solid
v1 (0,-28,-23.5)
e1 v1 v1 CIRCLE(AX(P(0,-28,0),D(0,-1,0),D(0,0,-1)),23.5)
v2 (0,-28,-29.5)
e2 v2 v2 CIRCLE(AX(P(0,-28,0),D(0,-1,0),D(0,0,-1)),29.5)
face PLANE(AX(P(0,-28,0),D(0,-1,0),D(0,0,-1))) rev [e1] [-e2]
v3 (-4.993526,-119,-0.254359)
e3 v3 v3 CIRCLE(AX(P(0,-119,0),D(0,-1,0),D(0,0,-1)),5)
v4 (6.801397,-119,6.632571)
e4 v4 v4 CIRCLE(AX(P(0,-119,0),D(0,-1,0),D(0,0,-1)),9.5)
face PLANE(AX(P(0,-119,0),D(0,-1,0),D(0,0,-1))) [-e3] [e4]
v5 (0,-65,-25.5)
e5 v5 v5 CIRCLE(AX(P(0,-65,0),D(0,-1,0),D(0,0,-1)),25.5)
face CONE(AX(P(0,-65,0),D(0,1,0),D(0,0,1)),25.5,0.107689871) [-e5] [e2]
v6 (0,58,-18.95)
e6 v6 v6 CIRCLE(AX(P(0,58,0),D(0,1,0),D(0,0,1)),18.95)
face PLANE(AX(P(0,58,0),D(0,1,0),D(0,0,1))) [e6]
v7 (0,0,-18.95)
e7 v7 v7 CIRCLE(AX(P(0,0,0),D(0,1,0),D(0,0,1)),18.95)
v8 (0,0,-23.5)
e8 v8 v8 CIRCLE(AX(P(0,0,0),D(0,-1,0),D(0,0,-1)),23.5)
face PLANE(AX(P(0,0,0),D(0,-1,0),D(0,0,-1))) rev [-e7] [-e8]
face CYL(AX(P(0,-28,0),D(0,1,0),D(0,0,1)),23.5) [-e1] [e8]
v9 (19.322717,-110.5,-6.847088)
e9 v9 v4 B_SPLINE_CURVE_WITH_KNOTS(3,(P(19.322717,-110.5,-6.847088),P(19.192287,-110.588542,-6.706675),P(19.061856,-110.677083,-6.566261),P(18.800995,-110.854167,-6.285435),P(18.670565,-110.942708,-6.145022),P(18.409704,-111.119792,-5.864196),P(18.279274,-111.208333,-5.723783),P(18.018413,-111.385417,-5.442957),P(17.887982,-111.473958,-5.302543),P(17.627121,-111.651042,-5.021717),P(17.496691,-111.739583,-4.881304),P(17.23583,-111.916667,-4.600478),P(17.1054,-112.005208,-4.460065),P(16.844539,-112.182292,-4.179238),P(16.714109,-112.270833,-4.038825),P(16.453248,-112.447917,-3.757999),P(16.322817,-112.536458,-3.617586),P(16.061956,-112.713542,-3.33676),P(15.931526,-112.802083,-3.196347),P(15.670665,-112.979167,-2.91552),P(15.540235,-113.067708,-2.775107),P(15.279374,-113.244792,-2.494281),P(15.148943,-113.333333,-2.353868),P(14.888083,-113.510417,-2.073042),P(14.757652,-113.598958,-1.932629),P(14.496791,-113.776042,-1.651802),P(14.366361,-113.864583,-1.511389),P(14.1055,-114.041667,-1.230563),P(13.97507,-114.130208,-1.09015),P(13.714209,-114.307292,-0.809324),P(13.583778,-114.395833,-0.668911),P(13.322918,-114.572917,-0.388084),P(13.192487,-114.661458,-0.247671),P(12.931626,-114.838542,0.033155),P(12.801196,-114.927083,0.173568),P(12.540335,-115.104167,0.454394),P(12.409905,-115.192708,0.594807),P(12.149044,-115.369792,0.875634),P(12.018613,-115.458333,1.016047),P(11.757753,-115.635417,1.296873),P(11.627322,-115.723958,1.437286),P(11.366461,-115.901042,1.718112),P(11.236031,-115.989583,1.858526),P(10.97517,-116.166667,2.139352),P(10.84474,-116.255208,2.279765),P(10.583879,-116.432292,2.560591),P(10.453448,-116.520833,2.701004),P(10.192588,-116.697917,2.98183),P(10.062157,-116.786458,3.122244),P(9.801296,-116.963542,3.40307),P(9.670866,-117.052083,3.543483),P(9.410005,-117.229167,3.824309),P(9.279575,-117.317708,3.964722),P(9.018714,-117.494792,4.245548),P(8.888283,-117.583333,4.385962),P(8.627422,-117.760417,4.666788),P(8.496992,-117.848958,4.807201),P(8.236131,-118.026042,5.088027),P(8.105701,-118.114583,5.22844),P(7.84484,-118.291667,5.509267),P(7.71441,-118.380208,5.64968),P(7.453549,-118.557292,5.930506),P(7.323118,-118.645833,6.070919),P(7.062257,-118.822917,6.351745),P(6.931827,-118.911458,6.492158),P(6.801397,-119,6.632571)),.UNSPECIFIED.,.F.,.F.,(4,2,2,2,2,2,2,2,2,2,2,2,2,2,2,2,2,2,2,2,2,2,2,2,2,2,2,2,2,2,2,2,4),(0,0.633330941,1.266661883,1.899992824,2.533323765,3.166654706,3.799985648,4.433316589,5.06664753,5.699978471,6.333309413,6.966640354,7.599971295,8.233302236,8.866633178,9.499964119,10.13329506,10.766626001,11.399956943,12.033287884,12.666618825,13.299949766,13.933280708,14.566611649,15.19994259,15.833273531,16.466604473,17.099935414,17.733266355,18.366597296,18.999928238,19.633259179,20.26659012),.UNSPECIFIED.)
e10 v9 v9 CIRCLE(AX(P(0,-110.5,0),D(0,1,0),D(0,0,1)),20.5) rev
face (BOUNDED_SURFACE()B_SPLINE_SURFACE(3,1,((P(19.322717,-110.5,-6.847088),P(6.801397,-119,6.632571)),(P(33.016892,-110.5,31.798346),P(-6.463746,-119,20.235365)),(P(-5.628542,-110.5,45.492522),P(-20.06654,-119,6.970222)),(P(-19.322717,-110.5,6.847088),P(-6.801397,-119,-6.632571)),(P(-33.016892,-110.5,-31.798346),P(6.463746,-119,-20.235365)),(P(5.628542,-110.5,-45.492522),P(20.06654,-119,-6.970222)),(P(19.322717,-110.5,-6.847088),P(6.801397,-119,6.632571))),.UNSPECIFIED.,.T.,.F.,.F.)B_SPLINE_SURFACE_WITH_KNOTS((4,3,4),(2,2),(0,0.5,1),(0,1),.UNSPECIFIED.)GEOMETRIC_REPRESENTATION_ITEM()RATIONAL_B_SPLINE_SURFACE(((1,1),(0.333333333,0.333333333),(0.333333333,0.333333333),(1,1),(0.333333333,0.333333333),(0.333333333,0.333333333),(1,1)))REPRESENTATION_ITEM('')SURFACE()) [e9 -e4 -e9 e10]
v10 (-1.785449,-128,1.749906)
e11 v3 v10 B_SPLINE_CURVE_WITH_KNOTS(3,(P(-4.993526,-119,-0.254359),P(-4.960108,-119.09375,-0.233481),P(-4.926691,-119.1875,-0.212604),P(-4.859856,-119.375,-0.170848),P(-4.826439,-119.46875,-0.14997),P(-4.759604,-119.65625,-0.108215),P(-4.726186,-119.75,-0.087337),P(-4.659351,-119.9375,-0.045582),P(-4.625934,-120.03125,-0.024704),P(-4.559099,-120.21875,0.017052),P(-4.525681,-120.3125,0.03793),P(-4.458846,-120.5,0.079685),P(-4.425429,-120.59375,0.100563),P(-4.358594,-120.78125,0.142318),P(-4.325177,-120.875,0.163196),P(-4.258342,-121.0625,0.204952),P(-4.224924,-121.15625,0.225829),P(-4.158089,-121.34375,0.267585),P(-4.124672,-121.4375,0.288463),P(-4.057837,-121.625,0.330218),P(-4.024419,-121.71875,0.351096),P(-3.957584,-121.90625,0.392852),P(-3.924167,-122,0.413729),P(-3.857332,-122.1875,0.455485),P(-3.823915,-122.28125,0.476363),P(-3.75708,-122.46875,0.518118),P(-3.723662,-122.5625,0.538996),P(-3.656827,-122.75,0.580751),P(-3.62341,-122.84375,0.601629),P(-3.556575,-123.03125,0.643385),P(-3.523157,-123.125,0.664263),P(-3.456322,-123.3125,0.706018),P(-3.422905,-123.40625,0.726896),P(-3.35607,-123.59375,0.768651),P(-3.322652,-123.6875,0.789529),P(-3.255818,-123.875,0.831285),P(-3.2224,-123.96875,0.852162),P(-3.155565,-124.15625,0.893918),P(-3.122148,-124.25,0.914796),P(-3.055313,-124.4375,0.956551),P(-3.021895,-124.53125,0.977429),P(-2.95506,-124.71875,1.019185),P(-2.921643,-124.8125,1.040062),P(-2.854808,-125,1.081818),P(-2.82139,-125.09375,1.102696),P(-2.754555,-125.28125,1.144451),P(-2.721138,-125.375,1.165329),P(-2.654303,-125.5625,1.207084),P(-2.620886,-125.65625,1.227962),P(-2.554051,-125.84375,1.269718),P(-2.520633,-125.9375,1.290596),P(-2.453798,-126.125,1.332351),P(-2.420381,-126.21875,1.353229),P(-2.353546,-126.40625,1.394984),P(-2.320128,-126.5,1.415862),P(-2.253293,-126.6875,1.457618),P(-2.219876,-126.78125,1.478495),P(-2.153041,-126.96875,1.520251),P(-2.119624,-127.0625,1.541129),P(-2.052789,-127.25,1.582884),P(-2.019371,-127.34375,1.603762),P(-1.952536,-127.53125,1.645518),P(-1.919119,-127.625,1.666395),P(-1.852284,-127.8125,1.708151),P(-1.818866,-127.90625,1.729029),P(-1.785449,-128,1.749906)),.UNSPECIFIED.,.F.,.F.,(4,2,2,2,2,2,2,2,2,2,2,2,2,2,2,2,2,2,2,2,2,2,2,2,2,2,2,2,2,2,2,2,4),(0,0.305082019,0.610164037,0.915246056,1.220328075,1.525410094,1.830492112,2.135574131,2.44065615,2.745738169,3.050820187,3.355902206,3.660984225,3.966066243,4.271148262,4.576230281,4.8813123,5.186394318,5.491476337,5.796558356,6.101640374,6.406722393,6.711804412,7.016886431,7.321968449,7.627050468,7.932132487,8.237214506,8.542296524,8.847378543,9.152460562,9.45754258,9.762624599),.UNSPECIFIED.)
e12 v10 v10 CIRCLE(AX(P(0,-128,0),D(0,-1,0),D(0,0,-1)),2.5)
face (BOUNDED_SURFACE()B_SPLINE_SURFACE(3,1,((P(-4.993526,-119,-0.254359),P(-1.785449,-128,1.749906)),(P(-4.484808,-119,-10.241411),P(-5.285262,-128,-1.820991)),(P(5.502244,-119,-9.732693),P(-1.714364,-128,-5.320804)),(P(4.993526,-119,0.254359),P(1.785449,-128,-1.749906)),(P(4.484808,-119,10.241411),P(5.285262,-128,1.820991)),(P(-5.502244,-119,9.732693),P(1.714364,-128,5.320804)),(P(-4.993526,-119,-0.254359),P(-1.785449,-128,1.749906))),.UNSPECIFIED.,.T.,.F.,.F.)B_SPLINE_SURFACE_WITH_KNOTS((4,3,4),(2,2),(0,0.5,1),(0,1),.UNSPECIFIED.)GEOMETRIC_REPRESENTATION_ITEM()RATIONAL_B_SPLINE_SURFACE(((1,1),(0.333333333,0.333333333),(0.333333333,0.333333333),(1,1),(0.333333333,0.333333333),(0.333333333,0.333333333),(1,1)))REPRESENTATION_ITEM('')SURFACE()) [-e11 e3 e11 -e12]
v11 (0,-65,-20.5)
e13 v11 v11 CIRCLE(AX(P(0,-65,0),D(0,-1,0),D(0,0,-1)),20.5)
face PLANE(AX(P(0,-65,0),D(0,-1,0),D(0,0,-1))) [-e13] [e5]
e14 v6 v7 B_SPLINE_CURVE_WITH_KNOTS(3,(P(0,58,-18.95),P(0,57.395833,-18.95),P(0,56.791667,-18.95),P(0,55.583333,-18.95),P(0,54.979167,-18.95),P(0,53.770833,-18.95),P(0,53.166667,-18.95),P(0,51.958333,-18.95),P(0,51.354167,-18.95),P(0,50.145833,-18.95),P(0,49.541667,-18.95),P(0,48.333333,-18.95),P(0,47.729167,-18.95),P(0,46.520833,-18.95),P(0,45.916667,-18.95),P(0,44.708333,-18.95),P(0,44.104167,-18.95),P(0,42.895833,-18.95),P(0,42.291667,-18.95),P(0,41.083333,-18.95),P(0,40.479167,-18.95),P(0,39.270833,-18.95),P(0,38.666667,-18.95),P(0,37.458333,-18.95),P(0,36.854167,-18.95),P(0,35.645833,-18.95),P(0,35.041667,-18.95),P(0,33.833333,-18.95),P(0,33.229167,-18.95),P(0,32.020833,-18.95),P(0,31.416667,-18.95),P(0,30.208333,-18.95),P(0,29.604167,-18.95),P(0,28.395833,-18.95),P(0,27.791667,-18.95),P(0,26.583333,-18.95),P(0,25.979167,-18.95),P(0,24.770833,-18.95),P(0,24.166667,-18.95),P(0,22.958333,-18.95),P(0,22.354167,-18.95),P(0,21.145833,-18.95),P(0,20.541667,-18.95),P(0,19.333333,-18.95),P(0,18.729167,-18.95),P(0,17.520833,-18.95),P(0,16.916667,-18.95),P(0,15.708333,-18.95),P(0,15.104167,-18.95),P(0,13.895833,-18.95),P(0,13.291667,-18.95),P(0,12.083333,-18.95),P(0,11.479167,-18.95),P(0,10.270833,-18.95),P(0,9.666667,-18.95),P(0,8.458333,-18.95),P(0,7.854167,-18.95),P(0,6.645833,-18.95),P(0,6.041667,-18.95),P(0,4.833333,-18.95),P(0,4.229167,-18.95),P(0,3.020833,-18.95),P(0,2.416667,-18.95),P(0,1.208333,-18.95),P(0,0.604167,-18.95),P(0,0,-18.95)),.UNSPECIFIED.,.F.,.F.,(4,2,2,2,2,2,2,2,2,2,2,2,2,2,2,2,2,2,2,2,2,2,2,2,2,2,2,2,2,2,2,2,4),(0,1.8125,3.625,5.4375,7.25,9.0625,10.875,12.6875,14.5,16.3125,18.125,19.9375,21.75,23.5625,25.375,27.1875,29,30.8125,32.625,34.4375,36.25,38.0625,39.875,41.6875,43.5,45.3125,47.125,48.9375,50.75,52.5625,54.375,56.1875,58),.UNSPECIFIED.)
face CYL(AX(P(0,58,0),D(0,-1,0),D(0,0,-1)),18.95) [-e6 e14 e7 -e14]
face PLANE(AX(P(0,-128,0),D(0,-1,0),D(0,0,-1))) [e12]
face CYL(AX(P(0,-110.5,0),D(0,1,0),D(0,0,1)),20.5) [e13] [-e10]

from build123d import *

# Parameters (mm, degrees)
SKETCH1_R           = 18.95
BOSS_EXTRUDE1_DEPTH = 58
SKETCH2_R           = 23.5
BOSS_EXTRUDE2_DEPTH = 28
SKETCH3_R           = 29.5
SKETCH4_R           = 25.5
SKETCH6_R           = 20.5
BOSS_EXTRUDE3_DEPTH = 45.5


with BuildPart() as part:
    # Sketch1 → Boss-Extrude1 (new body)
    with BuildSketch(Plane(origin=(0, 0, 0), x_dir=(1, 0, 0), z_dir=(0, 1, 0))):
        with Locations(Location((0, 0, 0), (0, 0, 90))):
            Circle(SKETCH1_R)
    extrude(amount=BOSS_EXTRUDE1_DEPTH)

    # Sketch2 → Boss-Extrude2 (add)
    with BuildSketch(Plane.XZ):
        with Locations(Location((0, 0, 0), (0, 0, 270))):
            Circle(SKETCH2_R)
    extrude(amount=BOSS_EXTRUDE2_DEPTH)

    # Sketch3 → Loft1 section 0
    with BuildSketch(Plane.XZ.offset(28)):
        Circle(SKETCH3_R)
    # Sketch4 → Loft1 section 1
    with BuildSketch(Plane(origin=(0, -65, 0), x_dir=(-1, 0, 0), z_dir=(0, -1, 0))):
        Circle(SKETCH4_R)
    loft()

    # Sketch6 → Boss-Extrude3 (add)
    with BuildSketch(Plane.XZ.offset(65)):
        with Locations(Location((0, 0, 0), (0, 0, 270))):
            Circle(SKETCH6_R)
    extrude(amount=BOSS_EXTRUDE3_DEPTH)

    # Loft2: read off the stored shape, not the designer's step
    # Loft2: loft between two sections, ruled curve by curve
    loft2_from = [
        Edge.make_bspline([(19.32271694, -110.5, -6.847087705), (33.01689235, -110.5, 31.798346176), (-5.628541531, -110.5, 45.492521586), (-19.32271694, -110.5, 6.847087705), (-33.01689235, -110.5, -31.798346176), (5.628541531, -110.5, -45.492521586), (19.32271694, -110.5, -6.847087705)], [0, 0, 0, 0, 0.5, 0.5, 0.5, 1, 1, 1, 1], 3, [1, 0.333333333, 0.333333333, 1, 0.333333333, 0.333333333, 1]),
    ]
    loft2_to = [
        Edge.make_bspline([(6.801396589, -119, 6.63257148), (-6.463746372, -119, 20.235364658), (-20.06653955, -119, 6.970221697), (-6.801396589, -119, -6.63257148), (6.463746372, -119, -20.235364658), (20.06653955, -119, -6.970221697), (6.801396589, -119, 6.63257148)], [0, 0, 0, 0, 0.5, 0.5, 0.5, 1, 1, 1, 1], 3, [1, 0.333333333, 0.333333333, 1, 0.333333333, 0.333333333, 1]),
    ]
    loft2 = Solid(Shell([*[Face.make_surface_from_curves(loft2_from[k], loft2_to[k]) for k in range(1)], Face(Wire(loft2_from)), Face(Wire(loft2_to))]))
    add(loft2)

    # Loft5: read off the stored shape, not the designer's step
    # Loft5: loft between two sections, ruled curve by curve
    loft5_from = [
        Edge.make_bspline([(-4.99352595, -119, -0.254359166), (-4.484807619, -119, -10.241411066), (5.502244282, -119, -9.732692735), (4.99352595, -119, 0.254359166), (4.484807619, -119, 10.241411066), (-5.502244282, -119, 9.732692735), (-4.99352595, -119, -0.254359166)], [0, 0, 0, 0, 0.5, 0.5, 0.5, 1, 1, 1, 1], 3, [1, 0.333333333, 0.333333333, 1, 0.333333333, 0.333333333, 1]),
    ]
    loft5_to = [
        Edge.make_bspline([(-1.785448857, -128, 1.749906392), (-5.28526164, -128, -1.820991321), (-1.714363927, -128, -5.320804105), (1.785448857, -128, -1.749906392), (5.28526164, -128, 1.820991321), (1.714363927, -128, 5.320804105), (-1.785448857, -128, 1.749906392)], [0, 0, 0, 0, 0.5, 0.5, 0.5, 1, 1, 1, 1], 3, [1, 0.333333333, 0.333333333, 1, 0.333333333, 0.333333333, 1]),
    ]
    loft5 = Solid(Shell([*[Face.make_surface_from_curves(loft5_from[k], loft5_to[k]) for k in range(1)], Face(Wire(loft5_from)), Face(Wire(loft5_to))]))
    add(loft5)


solid = part.part
